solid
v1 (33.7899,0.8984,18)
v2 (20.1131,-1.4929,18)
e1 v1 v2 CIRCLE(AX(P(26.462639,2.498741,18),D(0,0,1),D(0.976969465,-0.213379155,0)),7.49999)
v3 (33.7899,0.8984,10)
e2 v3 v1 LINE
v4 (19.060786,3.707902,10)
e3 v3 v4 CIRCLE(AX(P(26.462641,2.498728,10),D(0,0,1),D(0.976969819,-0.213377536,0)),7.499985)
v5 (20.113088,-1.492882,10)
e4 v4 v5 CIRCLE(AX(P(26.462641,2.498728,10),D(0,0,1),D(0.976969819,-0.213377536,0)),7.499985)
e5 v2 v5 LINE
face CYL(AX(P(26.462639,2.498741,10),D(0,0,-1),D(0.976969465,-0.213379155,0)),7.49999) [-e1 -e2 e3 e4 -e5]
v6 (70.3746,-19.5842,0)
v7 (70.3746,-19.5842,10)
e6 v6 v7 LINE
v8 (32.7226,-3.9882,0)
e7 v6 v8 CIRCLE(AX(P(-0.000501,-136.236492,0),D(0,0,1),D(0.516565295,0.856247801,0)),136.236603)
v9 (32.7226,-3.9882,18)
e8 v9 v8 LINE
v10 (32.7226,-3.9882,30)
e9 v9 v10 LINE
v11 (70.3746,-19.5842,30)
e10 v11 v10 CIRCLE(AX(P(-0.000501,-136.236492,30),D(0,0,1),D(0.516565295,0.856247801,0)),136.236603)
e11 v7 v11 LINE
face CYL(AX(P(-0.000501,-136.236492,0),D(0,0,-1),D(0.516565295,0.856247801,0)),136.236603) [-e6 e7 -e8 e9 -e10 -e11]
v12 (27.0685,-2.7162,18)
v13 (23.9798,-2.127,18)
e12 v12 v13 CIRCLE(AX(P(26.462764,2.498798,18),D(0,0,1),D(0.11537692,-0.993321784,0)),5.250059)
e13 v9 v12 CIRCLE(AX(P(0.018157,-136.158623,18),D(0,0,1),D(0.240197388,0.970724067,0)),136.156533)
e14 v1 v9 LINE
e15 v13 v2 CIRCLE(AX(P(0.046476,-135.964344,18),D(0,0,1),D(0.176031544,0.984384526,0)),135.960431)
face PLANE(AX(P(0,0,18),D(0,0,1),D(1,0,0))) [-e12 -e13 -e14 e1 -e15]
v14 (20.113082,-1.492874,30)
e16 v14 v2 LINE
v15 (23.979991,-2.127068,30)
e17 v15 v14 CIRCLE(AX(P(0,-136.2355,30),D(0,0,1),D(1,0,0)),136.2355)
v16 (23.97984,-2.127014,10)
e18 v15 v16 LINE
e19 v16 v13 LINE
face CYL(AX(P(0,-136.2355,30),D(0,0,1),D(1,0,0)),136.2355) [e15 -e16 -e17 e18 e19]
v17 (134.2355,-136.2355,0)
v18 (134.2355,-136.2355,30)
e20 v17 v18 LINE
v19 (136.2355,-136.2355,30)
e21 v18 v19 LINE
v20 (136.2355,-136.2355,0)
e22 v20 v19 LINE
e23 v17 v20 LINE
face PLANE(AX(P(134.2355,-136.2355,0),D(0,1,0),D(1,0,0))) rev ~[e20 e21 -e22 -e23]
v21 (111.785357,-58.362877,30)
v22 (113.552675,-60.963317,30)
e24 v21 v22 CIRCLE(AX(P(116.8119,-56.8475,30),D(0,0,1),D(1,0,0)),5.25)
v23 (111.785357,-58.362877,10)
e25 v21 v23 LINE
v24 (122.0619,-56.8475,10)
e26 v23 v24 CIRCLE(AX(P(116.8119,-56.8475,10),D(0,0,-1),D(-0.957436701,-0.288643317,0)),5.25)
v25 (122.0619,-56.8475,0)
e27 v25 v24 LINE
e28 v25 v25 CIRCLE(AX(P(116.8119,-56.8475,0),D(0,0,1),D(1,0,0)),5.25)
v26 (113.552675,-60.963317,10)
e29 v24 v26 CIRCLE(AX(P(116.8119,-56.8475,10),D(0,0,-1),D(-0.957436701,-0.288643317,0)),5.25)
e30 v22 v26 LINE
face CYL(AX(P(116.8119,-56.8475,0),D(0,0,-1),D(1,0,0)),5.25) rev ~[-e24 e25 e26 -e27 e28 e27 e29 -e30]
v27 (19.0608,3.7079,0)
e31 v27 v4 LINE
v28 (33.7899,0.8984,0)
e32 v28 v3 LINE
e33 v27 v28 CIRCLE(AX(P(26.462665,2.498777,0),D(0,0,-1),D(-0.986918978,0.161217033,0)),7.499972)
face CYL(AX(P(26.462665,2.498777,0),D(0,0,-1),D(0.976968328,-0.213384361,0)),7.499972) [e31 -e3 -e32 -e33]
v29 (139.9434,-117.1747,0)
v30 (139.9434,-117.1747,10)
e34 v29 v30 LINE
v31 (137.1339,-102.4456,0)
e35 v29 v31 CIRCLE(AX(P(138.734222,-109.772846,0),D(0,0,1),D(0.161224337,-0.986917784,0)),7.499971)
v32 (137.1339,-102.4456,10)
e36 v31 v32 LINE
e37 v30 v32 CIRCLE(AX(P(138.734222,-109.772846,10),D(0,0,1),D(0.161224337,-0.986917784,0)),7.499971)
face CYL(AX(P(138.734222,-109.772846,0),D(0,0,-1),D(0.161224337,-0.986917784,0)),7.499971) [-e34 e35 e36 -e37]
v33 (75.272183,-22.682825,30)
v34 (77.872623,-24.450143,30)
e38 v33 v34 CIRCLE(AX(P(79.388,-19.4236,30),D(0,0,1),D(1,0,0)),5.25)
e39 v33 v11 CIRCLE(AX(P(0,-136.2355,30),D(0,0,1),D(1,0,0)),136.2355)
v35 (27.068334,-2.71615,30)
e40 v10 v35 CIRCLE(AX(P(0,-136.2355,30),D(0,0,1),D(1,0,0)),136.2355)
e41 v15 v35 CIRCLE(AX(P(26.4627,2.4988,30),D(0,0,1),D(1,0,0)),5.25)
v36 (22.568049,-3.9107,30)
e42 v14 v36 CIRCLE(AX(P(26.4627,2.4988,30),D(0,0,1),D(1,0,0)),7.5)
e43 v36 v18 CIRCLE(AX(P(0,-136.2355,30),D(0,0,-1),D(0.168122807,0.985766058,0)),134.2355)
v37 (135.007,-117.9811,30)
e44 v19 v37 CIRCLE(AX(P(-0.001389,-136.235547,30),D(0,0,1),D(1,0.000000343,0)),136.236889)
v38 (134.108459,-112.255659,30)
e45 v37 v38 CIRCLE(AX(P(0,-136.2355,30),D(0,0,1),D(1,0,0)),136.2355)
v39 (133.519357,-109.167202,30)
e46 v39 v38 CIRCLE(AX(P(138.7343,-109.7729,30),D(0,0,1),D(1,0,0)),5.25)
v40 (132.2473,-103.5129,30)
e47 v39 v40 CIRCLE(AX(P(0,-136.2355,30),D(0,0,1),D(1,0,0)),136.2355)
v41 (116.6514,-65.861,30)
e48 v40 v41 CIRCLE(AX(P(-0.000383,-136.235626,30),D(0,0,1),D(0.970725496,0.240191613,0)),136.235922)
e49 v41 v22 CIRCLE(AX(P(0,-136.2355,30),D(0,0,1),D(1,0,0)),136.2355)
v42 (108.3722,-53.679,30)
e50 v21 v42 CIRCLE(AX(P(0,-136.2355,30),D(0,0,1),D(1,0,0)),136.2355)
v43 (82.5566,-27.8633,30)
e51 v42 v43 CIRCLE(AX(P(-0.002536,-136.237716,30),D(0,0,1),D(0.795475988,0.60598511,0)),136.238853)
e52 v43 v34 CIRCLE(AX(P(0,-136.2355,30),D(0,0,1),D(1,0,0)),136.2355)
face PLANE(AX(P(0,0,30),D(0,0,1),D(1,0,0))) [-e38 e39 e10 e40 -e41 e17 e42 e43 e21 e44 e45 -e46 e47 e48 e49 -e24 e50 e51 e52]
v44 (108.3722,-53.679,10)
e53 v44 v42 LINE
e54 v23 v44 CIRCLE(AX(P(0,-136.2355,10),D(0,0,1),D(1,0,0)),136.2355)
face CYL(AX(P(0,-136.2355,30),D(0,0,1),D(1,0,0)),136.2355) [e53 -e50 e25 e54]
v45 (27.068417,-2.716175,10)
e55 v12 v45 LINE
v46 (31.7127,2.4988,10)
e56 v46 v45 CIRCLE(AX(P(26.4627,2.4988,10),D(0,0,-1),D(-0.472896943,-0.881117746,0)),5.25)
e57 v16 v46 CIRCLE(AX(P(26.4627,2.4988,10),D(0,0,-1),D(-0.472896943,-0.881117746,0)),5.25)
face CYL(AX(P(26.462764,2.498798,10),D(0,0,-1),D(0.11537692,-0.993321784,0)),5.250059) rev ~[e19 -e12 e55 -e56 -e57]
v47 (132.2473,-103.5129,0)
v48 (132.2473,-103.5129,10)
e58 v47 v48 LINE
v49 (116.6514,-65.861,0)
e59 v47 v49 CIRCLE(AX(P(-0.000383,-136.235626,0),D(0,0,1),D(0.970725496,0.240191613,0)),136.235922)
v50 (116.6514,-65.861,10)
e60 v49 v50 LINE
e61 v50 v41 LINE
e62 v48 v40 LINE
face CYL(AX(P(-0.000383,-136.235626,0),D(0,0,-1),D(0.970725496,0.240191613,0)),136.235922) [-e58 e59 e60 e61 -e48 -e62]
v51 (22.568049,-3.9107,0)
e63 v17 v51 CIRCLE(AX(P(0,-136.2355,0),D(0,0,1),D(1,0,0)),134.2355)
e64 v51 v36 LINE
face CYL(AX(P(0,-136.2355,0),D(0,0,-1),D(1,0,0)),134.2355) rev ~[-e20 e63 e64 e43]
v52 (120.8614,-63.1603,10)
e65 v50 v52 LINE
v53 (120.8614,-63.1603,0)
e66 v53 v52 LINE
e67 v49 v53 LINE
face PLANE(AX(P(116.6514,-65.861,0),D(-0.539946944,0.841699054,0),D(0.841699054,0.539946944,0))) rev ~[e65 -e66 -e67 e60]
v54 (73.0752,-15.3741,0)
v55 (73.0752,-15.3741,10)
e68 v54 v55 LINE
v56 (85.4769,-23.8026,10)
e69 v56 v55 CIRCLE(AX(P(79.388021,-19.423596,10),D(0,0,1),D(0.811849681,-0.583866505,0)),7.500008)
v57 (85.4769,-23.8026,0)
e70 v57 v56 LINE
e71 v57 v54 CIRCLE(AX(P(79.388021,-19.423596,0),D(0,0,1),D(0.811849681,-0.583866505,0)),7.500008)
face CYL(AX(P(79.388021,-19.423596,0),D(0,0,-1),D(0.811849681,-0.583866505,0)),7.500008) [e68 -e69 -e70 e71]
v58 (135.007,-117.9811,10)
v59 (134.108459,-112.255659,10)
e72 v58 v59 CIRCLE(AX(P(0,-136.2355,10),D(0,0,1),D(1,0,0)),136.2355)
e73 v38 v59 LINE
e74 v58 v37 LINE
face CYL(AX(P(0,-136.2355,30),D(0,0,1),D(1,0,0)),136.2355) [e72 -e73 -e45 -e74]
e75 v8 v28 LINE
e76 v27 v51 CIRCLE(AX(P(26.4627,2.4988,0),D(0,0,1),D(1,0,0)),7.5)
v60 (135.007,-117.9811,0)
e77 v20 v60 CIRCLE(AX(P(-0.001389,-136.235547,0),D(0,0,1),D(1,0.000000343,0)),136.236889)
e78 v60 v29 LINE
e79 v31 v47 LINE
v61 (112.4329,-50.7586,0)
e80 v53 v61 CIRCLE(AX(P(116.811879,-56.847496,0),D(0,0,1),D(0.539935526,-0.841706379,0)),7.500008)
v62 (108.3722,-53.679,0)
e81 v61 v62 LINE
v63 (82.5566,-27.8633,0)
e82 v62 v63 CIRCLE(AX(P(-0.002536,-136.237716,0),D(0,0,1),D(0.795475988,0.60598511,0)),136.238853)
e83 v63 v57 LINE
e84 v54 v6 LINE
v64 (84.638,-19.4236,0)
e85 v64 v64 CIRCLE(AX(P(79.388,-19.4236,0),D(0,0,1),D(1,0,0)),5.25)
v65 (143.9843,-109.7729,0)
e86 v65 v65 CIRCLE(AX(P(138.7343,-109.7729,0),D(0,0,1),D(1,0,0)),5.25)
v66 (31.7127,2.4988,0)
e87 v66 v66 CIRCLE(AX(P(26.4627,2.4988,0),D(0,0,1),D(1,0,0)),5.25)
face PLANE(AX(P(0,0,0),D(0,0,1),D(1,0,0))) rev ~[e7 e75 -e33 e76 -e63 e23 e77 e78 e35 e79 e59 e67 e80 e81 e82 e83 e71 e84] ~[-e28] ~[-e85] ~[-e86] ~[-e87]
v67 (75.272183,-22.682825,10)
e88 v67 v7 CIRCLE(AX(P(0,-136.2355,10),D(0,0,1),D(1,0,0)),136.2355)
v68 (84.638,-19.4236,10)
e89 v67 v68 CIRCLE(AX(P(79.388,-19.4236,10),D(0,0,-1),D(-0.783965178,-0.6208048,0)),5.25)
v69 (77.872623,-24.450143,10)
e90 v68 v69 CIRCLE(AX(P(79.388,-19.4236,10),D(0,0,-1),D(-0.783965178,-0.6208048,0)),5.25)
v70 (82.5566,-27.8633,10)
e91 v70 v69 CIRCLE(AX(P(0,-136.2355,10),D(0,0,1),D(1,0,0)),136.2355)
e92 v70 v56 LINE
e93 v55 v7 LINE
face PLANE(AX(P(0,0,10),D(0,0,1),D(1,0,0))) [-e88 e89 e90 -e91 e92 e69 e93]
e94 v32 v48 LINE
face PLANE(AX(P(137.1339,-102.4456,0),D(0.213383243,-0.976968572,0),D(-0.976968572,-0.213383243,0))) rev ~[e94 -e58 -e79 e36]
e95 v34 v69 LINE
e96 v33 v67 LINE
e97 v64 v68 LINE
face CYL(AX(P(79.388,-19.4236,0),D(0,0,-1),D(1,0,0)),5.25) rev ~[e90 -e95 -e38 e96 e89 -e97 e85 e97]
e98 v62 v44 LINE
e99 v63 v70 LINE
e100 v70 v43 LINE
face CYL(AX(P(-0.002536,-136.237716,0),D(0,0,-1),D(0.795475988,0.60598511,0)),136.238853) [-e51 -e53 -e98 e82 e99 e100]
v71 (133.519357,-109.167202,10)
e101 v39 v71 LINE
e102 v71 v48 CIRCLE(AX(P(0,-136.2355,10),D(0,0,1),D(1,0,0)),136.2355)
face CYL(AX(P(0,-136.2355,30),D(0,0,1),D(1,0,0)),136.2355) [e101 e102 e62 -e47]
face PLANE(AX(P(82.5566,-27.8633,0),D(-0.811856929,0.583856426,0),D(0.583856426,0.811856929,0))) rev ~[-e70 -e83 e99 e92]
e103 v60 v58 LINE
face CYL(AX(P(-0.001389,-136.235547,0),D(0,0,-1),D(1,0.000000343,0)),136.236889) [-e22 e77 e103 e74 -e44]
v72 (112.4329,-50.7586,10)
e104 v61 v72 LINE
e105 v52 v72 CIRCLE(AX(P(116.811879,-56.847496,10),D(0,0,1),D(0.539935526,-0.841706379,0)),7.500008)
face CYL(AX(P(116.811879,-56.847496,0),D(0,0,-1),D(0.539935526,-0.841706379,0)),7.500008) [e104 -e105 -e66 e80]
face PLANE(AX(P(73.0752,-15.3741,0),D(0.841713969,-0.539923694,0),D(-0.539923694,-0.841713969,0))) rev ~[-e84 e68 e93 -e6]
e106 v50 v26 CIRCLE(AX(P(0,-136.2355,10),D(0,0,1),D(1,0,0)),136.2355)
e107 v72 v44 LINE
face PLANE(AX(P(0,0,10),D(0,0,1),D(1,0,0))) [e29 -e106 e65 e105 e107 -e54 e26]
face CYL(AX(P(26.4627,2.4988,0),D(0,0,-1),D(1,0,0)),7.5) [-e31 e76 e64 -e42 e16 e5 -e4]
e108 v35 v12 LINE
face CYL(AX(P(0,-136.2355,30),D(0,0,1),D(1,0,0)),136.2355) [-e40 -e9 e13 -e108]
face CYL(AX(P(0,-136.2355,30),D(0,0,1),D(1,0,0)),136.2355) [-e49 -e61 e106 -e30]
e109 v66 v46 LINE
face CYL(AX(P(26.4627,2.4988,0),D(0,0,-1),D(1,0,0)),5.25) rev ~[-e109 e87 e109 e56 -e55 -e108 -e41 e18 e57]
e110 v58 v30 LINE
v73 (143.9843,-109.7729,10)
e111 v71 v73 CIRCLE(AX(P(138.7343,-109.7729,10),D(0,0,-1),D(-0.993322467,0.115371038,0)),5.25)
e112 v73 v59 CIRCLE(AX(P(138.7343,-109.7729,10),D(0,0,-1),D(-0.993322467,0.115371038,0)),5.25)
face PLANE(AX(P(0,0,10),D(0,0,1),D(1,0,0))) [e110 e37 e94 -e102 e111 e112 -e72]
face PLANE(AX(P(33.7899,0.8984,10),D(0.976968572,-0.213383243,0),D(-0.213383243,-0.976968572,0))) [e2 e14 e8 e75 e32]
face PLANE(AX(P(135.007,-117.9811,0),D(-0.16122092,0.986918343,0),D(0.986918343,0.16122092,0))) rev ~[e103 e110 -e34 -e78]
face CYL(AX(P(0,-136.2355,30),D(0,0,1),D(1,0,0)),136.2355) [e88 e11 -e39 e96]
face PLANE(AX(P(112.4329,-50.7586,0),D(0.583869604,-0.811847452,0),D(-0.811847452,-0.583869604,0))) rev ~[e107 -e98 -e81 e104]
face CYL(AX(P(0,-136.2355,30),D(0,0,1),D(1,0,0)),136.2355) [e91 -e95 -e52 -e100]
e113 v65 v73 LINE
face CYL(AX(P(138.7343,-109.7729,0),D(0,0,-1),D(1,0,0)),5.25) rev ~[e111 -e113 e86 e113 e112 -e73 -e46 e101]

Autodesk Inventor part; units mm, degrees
ref_plane "YZ Plane" through (0, 0, 0) normal (1, 0, 0) x (0, 1, 0)
ref_plane "XZ Plane" through (0, 0, 0) normal (0, 1, 0) x (-1, 0, 0)
ref_plane "XY Plane" through (0, 0, 0) normal (0, 0, 1) x (1, 0, 0)
sketch "Sketch2" plane through (0, 0, 0) normal (0, 0, 1) x (1, 0, 0)
  circle A0 centre (138.7343, -109.7729) radius 5.25 projected
  circle A1 centre (116.8119, -56.8475) radius 5.25 projected
  circle A2 centre (26.4627, 2.4988) radius 5.25 projected
  circle A3 centre (79.388, -19.4236) radius 5.25 projected
  line L0 (116.6514, -65.861) -> (120.8614, -63.1603) projected
  arc A4 (120.8614, -63.1603) -> (112.4329, -50.7586) centre (116.8119, -56.8475) ccw projected
  line L1 (112.4329, -50.7586) -> (108.3722, -53.679) projected
  arc A5 (108.3722, -53.679) -> (82.5566, -27.8633) centre (0, -136.2355) ccw projected
  line L2 (82.5566, -27.8633) -> (85.4769, -23.8026) projected
  arc A6 (85.4769, -23.8026) -> (73.0752, -15.3741) centre (79.388, -19.4236) ccw projected
  line L3 (73.0752, -15.3741) -> (70.3746, -19.5842) projected
  arc A7 (70.3746, -19.5842) -> (32.7226, -3.9882) centre (0, -136.2355) ccw projected
  line L4 (32.7226, -3.9882) -> (33.7899, 0.8984) projected
  arc A8 (33.7899, 0.8984) -> (19.0608, 3.7079) centre (26.4627, 2.4988) ccw projected
  line L5 (19.0608, 3.7079) -> (18.2544, -1.2285) projected
  arc A9 (18.2544, -1.2285) -> (0, 0) centre (0, -136.2355) ccw projected
  line L6 (0, 0) -> (0, -2) projected
  arc A10 (134.2355, -136.2355) -> (0, -2) centre (0, -136.2355) ccw projected
  line L7 (134.2355, -136.2355) -> (136.2355, -136.2355) projected
  arc A11 (136.2355, -136.2355) -> (135.007, -117.9811) centre (0, -136.2355) ccw projected
  line L8 (135.007, -117.9811) -> (139.9434, -117.1747) projected
  arc A12 (139.9434, -117.1747) -> (137.1339, -102.4456) centre (138.7343, -109.7729) ccw projected
  line L9 (137.1339, -102.4456) -> (132.2473, -103.5129) projected
  arc A13 (132.2473, -103.5129) -> (116.6514, -65.861) centre (0, -136.2355) ccw projected
  arc A14 (18.2544, -1.2285) -> (-23.9798, -2.127) centre (0, -136.2355) ccw projected
  arc A15 (-27.0685, -2.7162) -> (-23.9798, -2.127) centre (-26.4627, 2.4988) ccw projected
  arc A16 (-27.0685, -2.7162) -> (-75.2721, -22.6828) centre (0, -136.2355) ccw projected
  arc A17 (-77.8727, -24.4502) -> (-75.2721, -22.6828) centre (-79.388, -19.4236) ccw projected
  arc A18 (-77.8727, -24.4502) -> (-111.7853, -58.3628) centre (0, -136.2355) ccw projected
  arc A19 (-113.5527, -60.9634) -> (-111.7853, -58.3628) centre (-116.8119, -56.8475) ccw projected
  arc A20 (-113.5527, -60.9634) -> (-133.5193, -109.1671) centre (0, -136.2355) ccw projected
  arc A21 (-134.1085, -112.2557) -> (-133.5193, -109.1671) centre (-138.7343, -109.7729) ccw projected
  arc A22 (-134.1085, -112.2557) -> (-136.2355, -136.2355) centre (0, -136.2355) ccw projected
  line L10 (-136.2355, -136.2355) -> (-134.2355, -136.2355) projected
  arc A23 (-133.4843, -122.0537) -> (-134.2355, -136.2355) centre (0, -136.2355) ccw projected
  arc A24 (-133.2582, -120.0666) -> (-133.4843, -122.0537) centre (0, -136.2355) ccw projected
  arc A25 (-124.3552, -85.689) -> (-133.2582, -120.0666) centre (0, -136.2355) ccw projected
  arc A26 (-123.5884, -83.8419) -> (-124.3552, -85.689) centre (0, -136.2355) ccw projected
  arc A27 (-90.6982, -37.2759) -> (-123.5884, -83.8419) centre (0, -136.2355) ccw projected
  arc A28 (-89.2138, -35.9356) -> (-90.6982, -37.2759) centre (0, -136.2355) ccw projected
  arc A29 (-24.5369, -4.2616) -> (-89.2138, -35.9356) centre (0, -136.2355) ccw projected
  line L11 (-24.5369, -4.2616) -> (-17.9914, -35.5817) projected
  arc A30 (-24.3732, -35.8597) -> (-17.9914, -35.5817) centre (-22.5679, -3.9107) ccw projected
  arc A31 (-24.3732, -35.8597) -> (-71.7399, -55.1686) centre (-13.0409, -131.4111) ccw projected
  line L12 (-71.7399, -55.1686) -> (-89.2138, -35.9356) projected
  line L13 (-89.2138, -35.9356) -> (-90.6982, -37.2759) projected
  line L14 (-90.6982, -37.2759) -> (-74.6321, -57.4663) projected
  arc A32 (-74.6321, -57.4663) -> (-103.6394, -92.1242) centre (2.2704, -151.2986) ccw projected
  line L15 (-103.6394, -92.1242) -> (-123.5884, -83.8419) projected
  line L16 (-123.5884, -83.8419) -> (-124.3552, -85.689) projected
  line L17 (-124.3552, -85.689) -> (-104.606, -93.8884) projected
  arc A33 (-104.606, -93.8884) -> (-115.4523, -121.9752) centre (2.2704, -151.2986) ccw projected
  line L18 (-115.4523, -121.9752) -> (-133.2582, -120.0666) projected
  line L19 (-133.2582, -120.0666) -> (-133.4843, -122.0537) projected
  line L20 (-133.4843, -122.0537) -> (-115.9197, -123.9199) projected
  arc A34 (-115.9197, -123.9199) -> (-118.1107, -136.2355) centre (2.2704, -151.2986) ccw projected
  line L21 (-118.1107, -136.2355) -> (-115.1005, -136.2355) projected
  arc A35 (-69.7224, -57.3892) -> (-115.1005, -136.2355) centre (4.4084, -152.5347) ccw projected
  arc A36 (-15.6263, -37.1945) -> (-69.7224, -57.3892) centre (-7.9541, -140.298) ccw projected
  arc A37 (-15.6263, -37.1945) -> (18.2544, -1.2285) centre (-20.5393, 1.3748) ccw projected
  circle A38 centre (26.4627, 2.4988) radius 7.5
  point P0 (19.0608, 3.7079)
  point P1 (22.5679, -3.9107)
extrude "Extrusion2" add sketch "Sketch2" along normal blind 30 contours A13 L9 A12 L8 A11 L7 A10 A38 L4 A7 L3 A6 L2 A5 L1 A4 L0 | A10 A38 A8
sketch "Sketch3" plane through (0, 0, 30) normal (0, 0, 1) x (1, 0, 0)
  line L0 (32.7226, -3.9882) -> (33.7899, 0.8984) projected
  arc A0 (33.7899, 0.8984) -> (22.5679, -3.9107) centre (26.4627, 2.4988) ccw projected
  arc A1 (134.2355, -136.2355) -> (22.5679, -3.9107) centre (0, -136.2355) ccw projected
  line L1 (134.2355, -136.2355) -> (136.2355, -136.2355) projected
  arc A2 (136.2355, -136.2355) -> (135.007, -117.9811) centre (0, -136.2355) ccw projected
  line L2 (135.007, -117.9811) -> (139.9434, -117.1747) projected
  arc A3 (139.9434, -117.1747) -> (137.1339, -102.4456) centre (138.7343, -109.7729) ccw projected
  line L3 (137.1339, -102.4456) -> (132.2473, -103.5129) projected
  arc A4 (132.2473, -103.5129) -> (116.6514, -65.861) centre (0, -136.2355) ccw projected
  line L4 (116.6514, -65.861) -> (120.8614, -63.1603) projected
  arc A5 (120.8614, -63.1603) -> (112.4329, -50.7586) centre (116.8119, -56.8475) ccw projected
  line L5 (112.4329, -50.7586) -> (108.3722, -53.679) projected
  arc A6 (108.3722, -53.679) -> (82.5566, -27.8633) centre (0, -136.2355) ccw projected
  line L6 (82.5566, -27.8633) -> (85.4769, -23.8026) projected
  arc A7 (85.4769, -23.8026) -> (73.0752, -15.3741) centre (79.388, -19.4236) ccw projected
  line L7 (73.0752, -15.3741) -> (70.3746, -19.5842) projected
  arc A8 (70.3746, -19.5842) -> (32.7226, -3.9882) centre (0, -136.2355) ccw projected
  circle A9 centre (26.4627, 2.4988) radius 5.25 projected
  circle A10 centre (79.388, -19.4236) radius 5.25 projected
  circle A11 centre (116.8119, -56.8475) radius 5.25 projected
  circle A12 centre (138.7343, -109.7729) radius 5.25 projected
  circle A13 centre (0, -136.2355) radius 136.2355
  point P0 (0, 0)
  point P1 (133.5193, -109.1671)
  point P2 (134.1085, -112.2557)
  point P3 (135.007, -117.9811)
  point P4 (111.7853, -58.3628)
  point P5 (113.5527, -60.9634)
  point P6 (116.6514, -65.861)
  point P7 (27.0685, -2.7162)
  point P8 (20.1131, -1.4929)
  point P9 (23.9798, -2.127)
  point P10 (75.2721, -22.6828)
  point P11 (77.8727, -24.4502)
  point P12 (82.5566, -27.8633)
extrude "Extrusion3" cut sketch "Sketch3" against normal blind 20 contours A13 A9 A0 L0 | L7 A7 L6 A13 A10 | A13 A12 L3 A3 L2 | L5 A5 L4 A13 A11
sketch "Sketch4" plane through (0, 0, 10) normal (0, 0, 1) x (1, 0, 0)
  line L0 (33.7899, 0.8984) -> (32.7226, -3.9882) projected
  arc A0 (33.7899, 0.8984) -> (20.1131, -1.4929) centre (26.4627, 2.4988) ccw projected
  arc A1 (23.9798, -2.127) -> (20.1131, -1.4929) centre (0, -136.2355) ccw projected
  arc A2 (27.0685, -2.7162) -> (23.9798, -2.127) centre (26.4627, 2.4988) ccw projected
  arc A3 (32.7226, -3.9882) -> (27.0685, -2.7162) centre (0, -136.2355) ccw projected
  point P0 (0, 0)
extrude "Extrusion4" add sketch "Sketch4" along normal blind 8
properties part number "HalfFilterwall3"
